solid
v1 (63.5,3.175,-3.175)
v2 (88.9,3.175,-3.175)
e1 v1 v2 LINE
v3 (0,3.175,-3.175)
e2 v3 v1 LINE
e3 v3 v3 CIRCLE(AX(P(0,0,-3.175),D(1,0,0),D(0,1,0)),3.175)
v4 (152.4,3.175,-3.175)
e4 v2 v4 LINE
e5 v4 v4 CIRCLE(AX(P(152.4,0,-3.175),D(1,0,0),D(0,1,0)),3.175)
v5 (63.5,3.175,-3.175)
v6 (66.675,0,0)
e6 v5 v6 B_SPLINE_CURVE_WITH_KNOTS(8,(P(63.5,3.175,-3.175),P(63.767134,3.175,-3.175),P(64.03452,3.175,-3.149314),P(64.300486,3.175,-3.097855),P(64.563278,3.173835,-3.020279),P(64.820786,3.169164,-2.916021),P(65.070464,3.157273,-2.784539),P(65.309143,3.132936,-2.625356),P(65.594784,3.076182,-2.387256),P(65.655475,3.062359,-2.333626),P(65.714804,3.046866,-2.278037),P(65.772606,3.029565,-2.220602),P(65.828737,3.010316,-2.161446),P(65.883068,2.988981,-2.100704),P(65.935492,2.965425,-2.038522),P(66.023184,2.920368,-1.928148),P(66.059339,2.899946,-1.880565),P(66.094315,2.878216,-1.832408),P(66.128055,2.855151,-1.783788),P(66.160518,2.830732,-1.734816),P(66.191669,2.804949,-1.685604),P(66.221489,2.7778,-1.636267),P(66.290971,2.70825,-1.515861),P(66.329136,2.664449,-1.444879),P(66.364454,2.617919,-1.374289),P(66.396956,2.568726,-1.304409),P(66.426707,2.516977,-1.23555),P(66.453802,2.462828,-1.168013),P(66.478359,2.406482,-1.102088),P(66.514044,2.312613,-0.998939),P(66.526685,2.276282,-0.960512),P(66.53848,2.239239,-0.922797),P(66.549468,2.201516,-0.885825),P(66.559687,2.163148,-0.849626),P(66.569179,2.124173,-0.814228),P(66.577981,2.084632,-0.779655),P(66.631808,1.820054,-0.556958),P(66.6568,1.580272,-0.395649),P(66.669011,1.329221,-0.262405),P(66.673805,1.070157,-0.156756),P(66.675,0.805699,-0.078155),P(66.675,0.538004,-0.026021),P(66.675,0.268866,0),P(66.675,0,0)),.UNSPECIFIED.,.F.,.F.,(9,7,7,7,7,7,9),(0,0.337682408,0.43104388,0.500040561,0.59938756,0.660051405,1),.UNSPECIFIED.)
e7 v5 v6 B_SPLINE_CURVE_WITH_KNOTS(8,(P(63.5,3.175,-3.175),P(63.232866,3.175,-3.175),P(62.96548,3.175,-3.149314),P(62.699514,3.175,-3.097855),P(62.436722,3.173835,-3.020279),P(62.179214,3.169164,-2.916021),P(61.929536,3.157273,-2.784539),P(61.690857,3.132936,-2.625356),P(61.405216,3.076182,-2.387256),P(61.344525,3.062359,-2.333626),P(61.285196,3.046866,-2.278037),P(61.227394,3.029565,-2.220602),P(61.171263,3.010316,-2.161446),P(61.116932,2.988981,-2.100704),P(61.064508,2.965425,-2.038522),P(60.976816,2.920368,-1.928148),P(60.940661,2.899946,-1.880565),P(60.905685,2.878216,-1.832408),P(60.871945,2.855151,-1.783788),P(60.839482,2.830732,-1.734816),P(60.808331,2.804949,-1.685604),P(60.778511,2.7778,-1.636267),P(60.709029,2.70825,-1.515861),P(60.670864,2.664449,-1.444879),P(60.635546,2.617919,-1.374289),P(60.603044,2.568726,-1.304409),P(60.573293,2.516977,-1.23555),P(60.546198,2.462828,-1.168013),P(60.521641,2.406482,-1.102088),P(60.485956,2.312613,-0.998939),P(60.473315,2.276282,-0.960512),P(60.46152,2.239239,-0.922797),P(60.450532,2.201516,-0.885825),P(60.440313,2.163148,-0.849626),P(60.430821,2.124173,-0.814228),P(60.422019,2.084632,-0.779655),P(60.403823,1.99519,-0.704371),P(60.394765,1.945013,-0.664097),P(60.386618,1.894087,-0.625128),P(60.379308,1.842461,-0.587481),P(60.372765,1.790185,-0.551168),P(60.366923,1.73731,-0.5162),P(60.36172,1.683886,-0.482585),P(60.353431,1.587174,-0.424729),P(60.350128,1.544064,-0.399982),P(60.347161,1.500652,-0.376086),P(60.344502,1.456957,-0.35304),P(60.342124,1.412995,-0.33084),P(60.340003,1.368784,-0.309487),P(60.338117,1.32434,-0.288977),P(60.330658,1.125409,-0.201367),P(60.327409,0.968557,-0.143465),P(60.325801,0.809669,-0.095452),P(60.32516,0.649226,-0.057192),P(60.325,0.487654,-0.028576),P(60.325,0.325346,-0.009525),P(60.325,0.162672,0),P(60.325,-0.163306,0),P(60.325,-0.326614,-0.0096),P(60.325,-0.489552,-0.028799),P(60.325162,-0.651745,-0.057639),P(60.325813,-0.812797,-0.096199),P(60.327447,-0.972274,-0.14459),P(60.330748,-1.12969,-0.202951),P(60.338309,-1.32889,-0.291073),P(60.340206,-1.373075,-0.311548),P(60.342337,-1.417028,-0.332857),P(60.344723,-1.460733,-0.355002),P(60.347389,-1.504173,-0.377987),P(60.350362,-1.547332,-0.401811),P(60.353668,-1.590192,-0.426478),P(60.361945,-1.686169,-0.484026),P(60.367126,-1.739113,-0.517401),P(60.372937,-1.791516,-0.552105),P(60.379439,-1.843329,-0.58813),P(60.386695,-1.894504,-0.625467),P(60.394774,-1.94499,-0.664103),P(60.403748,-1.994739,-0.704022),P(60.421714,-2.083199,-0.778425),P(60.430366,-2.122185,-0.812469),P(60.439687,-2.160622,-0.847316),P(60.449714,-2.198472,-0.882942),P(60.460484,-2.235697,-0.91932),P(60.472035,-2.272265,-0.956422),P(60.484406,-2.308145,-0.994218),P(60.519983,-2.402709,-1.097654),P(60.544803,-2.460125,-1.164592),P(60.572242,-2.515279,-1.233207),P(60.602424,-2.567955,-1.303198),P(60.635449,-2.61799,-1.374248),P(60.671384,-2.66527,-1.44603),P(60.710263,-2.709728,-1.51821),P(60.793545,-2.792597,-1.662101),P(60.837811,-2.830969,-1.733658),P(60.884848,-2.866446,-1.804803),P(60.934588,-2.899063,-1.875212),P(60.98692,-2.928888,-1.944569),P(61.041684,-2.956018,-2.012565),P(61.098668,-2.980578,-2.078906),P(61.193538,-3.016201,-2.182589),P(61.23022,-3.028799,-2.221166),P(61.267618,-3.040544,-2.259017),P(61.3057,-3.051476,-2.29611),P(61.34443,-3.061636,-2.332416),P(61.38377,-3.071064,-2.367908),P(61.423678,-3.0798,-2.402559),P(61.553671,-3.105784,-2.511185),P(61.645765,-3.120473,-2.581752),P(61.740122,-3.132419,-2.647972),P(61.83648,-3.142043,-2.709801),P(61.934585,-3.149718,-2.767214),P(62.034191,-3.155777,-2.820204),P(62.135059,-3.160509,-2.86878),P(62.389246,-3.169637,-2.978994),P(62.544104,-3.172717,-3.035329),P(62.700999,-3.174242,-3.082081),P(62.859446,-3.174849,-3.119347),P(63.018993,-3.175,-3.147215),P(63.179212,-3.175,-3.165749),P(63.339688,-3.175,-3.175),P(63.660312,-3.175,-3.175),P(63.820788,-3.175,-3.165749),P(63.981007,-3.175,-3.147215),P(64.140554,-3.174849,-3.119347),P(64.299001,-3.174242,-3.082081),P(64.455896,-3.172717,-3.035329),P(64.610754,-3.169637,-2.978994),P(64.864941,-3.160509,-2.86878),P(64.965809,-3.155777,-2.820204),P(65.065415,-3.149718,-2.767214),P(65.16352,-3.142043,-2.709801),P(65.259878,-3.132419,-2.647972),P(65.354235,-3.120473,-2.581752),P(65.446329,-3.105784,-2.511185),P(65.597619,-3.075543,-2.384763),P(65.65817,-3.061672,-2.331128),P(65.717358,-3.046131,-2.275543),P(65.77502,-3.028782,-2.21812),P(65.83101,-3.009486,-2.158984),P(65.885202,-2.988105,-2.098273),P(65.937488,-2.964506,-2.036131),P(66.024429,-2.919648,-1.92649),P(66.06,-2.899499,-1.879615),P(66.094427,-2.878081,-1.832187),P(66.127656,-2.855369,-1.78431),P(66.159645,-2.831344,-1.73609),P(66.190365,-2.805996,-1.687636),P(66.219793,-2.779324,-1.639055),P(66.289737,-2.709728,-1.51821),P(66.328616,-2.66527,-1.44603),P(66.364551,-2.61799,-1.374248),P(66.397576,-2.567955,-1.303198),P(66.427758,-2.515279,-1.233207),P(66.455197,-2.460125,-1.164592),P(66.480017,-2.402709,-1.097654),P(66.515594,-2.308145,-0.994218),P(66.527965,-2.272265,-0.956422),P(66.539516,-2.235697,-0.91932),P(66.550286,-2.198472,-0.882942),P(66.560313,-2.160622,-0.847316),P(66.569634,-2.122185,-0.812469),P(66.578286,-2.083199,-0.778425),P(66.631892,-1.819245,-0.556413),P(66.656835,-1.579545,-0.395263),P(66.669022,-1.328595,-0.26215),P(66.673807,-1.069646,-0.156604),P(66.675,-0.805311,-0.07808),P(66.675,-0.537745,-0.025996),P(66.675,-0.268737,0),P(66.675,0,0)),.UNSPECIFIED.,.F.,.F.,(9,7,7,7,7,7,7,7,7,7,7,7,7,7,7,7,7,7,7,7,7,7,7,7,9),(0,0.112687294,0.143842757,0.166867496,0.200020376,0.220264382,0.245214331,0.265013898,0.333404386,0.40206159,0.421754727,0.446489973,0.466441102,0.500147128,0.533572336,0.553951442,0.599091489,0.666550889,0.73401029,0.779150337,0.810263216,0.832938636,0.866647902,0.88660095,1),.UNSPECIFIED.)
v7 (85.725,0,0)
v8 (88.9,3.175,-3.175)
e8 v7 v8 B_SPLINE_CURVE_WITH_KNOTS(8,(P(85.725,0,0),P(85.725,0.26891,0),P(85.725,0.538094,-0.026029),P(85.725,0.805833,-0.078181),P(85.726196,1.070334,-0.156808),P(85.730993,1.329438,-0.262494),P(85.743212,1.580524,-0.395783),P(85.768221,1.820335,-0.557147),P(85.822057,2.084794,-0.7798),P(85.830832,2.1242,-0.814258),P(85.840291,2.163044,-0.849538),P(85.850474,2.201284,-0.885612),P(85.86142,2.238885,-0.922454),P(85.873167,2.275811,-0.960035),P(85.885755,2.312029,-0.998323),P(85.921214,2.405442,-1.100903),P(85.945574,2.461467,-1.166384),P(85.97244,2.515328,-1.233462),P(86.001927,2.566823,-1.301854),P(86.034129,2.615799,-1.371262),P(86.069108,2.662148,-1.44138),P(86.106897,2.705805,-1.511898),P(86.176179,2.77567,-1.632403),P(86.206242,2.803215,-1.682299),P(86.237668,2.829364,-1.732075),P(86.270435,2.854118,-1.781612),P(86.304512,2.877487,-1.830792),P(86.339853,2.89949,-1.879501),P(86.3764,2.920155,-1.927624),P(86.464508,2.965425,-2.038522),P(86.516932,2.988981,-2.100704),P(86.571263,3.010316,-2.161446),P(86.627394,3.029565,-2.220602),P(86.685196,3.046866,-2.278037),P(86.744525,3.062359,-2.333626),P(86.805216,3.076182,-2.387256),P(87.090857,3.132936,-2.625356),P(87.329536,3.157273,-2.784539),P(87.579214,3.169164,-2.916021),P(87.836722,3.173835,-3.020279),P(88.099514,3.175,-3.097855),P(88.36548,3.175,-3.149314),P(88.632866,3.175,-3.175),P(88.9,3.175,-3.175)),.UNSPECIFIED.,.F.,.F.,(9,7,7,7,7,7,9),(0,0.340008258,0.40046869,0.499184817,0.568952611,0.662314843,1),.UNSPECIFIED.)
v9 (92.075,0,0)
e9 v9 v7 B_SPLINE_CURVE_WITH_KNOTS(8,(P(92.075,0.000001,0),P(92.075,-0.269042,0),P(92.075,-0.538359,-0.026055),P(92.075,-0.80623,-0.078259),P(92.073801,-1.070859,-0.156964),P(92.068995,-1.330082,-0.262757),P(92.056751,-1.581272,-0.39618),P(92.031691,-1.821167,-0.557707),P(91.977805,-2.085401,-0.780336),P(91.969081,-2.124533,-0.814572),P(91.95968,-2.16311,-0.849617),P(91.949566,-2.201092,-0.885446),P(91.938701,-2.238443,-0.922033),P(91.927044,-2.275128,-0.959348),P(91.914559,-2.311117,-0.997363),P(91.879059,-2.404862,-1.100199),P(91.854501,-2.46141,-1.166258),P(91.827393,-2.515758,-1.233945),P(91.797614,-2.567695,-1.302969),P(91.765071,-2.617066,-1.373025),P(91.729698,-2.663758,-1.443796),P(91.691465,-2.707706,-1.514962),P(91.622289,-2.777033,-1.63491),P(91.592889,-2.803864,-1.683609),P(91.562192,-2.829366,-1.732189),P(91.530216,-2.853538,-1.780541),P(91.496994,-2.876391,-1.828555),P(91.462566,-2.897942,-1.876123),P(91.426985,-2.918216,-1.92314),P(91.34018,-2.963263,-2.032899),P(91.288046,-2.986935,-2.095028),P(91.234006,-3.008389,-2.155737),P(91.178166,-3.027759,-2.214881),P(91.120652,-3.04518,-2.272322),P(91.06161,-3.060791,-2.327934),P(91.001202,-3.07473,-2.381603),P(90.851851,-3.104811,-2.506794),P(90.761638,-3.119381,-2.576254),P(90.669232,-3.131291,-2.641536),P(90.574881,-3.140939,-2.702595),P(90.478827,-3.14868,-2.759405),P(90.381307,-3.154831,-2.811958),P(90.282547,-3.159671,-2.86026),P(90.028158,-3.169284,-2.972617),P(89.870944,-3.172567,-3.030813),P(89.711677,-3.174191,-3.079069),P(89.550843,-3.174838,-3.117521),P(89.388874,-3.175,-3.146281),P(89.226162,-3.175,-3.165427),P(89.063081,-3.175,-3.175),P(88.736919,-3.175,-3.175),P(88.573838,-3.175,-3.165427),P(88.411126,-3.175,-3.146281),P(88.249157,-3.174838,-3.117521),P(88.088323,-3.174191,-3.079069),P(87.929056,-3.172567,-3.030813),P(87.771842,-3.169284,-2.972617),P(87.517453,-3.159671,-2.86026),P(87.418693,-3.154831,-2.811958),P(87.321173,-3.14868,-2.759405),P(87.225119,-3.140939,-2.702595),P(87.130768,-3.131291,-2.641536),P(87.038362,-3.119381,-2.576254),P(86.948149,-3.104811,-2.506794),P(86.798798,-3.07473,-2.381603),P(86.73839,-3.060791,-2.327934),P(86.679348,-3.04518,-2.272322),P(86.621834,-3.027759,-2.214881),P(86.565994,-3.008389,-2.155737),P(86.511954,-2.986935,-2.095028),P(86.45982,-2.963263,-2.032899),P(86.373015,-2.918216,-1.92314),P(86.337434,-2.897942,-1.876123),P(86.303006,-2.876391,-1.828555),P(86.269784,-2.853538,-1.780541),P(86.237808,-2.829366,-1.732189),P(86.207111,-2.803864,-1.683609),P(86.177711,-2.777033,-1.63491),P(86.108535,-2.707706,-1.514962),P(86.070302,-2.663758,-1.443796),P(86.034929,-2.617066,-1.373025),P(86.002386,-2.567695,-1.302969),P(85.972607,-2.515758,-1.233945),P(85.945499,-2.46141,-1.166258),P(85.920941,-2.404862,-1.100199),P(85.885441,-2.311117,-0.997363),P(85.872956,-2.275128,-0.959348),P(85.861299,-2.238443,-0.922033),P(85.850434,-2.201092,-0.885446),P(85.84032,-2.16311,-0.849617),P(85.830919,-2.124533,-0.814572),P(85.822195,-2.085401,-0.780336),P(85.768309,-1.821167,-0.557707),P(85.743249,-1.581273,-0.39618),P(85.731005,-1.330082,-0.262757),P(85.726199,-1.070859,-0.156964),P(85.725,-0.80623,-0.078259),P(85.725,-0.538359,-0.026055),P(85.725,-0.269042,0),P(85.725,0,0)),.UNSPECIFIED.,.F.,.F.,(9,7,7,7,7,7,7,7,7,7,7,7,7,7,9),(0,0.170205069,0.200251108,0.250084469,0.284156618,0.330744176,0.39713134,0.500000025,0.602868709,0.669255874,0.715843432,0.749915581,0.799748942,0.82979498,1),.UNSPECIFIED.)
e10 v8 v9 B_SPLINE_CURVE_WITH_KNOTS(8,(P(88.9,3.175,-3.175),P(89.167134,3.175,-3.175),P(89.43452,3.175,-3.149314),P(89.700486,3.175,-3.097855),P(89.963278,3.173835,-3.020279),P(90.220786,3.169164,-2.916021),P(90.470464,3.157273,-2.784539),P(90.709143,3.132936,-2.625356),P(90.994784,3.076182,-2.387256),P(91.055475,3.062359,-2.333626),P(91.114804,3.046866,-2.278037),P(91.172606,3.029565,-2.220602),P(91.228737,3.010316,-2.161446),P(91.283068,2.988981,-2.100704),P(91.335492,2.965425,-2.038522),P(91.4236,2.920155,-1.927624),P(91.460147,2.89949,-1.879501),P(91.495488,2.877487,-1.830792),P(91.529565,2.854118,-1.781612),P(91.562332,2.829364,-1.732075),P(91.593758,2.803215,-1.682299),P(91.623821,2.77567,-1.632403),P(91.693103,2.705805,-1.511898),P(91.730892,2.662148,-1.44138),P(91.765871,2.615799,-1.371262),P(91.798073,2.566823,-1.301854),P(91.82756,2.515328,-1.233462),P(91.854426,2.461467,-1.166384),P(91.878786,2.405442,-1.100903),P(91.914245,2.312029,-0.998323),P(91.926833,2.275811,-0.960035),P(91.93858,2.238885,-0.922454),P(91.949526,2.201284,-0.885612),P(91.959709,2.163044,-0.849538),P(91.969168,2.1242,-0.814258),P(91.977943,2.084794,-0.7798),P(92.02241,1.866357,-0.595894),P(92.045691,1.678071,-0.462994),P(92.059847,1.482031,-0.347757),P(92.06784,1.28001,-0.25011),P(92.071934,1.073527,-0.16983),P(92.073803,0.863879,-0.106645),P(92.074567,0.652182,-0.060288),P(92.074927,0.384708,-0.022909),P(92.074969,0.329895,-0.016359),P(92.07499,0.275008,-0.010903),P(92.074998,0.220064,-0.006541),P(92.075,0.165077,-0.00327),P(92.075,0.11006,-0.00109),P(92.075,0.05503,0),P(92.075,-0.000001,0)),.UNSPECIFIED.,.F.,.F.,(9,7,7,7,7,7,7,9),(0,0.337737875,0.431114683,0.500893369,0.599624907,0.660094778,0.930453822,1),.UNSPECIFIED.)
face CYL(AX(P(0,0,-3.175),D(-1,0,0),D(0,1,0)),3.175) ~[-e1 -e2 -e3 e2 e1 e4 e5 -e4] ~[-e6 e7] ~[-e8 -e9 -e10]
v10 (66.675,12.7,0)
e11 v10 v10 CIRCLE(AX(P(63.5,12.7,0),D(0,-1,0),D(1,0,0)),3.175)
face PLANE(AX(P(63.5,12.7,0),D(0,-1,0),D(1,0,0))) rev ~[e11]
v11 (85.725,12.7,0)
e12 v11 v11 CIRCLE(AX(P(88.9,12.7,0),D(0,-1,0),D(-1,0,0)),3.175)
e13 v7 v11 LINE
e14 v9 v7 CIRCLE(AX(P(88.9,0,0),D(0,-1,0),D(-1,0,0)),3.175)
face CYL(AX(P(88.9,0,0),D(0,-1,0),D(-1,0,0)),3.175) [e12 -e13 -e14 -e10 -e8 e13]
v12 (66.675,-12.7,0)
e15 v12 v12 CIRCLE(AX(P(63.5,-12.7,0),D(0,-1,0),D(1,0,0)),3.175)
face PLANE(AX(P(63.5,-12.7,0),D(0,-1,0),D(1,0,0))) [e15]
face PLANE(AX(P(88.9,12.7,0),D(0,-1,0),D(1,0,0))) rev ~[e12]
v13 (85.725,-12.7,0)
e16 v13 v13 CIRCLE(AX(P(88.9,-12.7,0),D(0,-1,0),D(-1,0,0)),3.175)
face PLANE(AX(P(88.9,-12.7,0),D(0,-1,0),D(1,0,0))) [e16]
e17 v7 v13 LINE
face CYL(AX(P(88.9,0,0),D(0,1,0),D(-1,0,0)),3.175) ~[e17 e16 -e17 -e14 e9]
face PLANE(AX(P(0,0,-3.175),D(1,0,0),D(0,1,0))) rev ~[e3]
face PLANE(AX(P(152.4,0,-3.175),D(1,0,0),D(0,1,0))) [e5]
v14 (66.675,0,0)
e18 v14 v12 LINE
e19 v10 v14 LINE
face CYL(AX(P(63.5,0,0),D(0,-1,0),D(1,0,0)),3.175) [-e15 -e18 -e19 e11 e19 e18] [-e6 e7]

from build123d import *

# Parameters (mm, degrees)
F0_R     = 3.175
F1_DEPTH = 152.4
F2_R     = 3.175
F3_DEPTH = 12.7


# Not quite as in the source:
# - a feature names something its author has since deleted; it is built from what else it names


with BuildPart() as f1:
    # F0 (on Right) → F1 (new body)
    with BuildSketch(Plane.YZ):
        with Locations((0, -3.175)):
            Circle(F0_R)
    extrude(amount=F1_DEPTH)

    # F2 (on Front) → F3 (join, symmetric)
    with BuildSketch(Plane.XZ):
        with BuildLine():
            ThreePointArc((92.075, 0), (88.9, 3.175), (85.725, 0))
            ThreePointArc((85.725, 0), (88.9, -3.175), (92.075, 0))
        make_face()
        with Locations((63.5, 0)):
            Circle(F2_R)
    extrude(amount=F3_DEPTH, both=True)


solid = f1.part
